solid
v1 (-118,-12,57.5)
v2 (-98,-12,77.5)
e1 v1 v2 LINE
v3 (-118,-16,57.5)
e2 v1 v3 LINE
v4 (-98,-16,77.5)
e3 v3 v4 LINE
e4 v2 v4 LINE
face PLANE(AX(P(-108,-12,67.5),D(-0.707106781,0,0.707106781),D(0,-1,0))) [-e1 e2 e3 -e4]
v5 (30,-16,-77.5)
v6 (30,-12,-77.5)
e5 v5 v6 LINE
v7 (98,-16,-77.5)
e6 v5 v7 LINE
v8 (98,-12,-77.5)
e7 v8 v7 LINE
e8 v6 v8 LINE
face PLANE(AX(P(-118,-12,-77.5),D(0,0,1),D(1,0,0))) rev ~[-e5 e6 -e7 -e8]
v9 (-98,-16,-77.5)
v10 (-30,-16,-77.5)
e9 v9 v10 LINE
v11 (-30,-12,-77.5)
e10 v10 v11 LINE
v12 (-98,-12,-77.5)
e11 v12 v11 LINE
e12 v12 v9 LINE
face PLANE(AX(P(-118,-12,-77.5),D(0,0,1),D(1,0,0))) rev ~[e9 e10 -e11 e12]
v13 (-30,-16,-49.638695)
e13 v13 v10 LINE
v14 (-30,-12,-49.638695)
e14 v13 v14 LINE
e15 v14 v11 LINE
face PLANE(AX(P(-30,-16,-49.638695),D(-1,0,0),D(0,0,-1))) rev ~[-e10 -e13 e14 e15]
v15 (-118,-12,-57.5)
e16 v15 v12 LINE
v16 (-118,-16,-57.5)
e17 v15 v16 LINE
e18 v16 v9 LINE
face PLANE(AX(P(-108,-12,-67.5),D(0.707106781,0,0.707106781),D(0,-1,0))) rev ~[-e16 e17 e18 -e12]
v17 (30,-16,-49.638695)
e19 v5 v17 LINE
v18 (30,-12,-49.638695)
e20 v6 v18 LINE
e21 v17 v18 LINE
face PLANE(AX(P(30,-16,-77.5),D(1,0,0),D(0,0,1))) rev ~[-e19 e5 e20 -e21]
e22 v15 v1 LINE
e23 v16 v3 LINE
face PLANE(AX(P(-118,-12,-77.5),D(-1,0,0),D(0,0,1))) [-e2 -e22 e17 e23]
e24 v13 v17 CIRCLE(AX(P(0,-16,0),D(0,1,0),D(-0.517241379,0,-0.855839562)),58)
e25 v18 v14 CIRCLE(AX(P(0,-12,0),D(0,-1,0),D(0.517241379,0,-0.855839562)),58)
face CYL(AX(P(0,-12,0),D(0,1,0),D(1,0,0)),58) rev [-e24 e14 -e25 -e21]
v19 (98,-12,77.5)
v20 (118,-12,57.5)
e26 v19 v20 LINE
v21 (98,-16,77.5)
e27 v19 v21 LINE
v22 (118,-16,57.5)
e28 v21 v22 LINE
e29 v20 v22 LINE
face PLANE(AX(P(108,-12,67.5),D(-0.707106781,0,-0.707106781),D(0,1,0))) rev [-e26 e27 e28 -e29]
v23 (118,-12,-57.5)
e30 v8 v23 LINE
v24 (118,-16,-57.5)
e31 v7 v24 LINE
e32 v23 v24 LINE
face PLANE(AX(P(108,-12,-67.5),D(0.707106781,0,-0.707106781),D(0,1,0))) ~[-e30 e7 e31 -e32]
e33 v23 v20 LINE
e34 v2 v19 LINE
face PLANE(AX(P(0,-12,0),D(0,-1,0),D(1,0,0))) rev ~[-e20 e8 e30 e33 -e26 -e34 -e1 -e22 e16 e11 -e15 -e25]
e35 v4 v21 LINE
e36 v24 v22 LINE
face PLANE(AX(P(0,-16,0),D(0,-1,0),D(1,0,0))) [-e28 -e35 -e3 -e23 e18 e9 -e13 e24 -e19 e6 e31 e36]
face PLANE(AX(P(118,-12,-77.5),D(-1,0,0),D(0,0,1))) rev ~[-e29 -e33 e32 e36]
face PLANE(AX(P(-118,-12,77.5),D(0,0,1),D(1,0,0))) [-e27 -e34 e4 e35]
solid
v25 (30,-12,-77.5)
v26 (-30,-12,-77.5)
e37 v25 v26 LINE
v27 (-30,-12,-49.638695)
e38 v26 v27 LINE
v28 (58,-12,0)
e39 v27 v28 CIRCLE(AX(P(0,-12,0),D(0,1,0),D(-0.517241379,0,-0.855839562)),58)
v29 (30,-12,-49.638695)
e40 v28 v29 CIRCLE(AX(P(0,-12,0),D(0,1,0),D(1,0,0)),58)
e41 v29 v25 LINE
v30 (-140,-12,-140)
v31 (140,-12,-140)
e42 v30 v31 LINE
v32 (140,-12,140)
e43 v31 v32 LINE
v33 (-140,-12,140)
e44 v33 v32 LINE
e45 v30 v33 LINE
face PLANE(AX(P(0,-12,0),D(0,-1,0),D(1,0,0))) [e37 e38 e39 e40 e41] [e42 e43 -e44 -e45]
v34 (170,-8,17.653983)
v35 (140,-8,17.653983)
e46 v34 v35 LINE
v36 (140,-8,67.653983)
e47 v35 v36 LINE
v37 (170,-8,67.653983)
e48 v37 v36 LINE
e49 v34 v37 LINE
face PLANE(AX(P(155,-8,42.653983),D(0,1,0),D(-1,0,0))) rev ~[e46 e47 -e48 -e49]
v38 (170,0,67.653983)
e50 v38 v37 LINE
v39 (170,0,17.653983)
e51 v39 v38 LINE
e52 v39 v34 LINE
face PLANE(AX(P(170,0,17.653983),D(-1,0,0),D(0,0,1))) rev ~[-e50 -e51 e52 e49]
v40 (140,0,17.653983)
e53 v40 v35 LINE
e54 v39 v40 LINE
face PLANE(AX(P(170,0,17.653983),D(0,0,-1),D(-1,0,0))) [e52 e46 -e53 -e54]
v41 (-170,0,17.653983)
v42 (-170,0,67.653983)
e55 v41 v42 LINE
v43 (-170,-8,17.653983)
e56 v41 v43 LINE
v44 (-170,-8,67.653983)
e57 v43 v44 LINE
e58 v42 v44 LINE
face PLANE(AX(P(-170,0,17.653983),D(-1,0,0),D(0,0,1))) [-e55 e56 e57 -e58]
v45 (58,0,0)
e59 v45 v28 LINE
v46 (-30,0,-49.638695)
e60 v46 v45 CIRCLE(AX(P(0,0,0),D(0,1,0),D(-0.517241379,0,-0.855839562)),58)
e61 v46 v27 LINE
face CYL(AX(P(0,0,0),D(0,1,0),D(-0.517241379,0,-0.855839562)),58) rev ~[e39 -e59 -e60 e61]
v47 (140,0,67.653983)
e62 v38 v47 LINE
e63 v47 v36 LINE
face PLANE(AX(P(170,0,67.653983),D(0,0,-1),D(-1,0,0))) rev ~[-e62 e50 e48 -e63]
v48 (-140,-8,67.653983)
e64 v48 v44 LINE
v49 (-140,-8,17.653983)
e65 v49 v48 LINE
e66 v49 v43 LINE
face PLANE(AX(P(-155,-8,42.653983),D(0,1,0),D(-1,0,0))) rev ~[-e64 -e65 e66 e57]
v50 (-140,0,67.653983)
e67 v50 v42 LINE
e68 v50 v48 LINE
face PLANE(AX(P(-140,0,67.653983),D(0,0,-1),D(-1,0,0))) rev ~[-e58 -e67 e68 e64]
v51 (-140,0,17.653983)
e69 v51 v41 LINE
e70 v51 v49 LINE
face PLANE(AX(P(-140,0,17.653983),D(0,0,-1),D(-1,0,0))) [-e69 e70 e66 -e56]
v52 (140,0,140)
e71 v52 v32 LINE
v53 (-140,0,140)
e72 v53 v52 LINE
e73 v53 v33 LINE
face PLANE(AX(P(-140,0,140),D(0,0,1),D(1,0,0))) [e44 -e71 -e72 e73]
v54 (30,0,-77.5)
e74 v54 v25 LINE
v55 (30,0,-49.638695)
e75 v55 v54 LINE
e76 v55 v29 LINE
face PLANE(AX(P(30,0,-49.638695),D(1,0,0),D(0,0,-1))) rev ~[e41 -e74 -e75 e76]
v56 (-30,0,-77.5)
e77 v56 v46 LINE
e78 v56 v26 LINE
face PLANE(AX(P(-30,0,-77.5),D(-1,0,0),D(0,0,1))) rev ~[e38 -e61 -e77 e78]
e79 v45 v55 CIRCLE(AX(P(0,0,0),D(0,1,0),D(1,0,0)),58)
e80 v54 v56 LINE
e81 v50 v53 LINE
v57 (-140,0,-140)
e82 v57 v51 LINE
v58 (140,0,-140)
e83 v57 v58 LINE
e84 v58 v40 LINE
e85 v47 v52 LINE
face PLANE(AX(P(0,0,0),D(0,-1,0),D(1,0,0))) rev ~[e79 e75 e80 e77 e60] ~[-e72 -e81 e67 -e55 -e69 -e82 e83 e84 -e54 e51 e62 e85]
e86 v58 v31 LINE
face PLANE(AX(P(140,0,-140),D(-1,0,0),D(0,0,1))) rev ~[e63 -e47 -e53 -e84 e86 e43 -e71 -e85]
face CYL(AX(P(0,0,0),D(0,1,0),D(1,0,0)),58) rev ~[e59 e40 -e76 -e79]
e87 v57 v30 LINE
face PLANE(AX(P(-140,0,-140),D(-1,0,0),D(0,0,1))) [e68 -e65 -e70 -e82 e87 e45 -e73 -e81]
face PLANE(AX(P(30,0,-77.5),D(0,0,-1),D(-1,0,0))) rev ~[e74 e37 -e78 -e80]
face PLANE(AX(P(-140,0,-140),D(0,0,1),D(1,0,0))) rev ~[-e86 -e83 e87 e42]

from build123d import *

# Parameters (mm, degrees)
F0_W     = 280
F0_H     = 280
F1_DEPTH = 12
F2_W     = 236
F2_H     = 155
F2_R     = 58
F3_DEPTH = 4
F4_SIZE  = 20
F5_W     = 30
F5_H     = 50
F6_DEPTH = 8
F8_DEPTH = 16.001
F9_DEPTH = 449


# Not quite as in the source:
# - an extrude ends at something that could not be found from the text; its depth is read off the source's solid


with BuildPart() as f1:
    # F0 (on Front) → F1 (new body)
    with BuildSketch(Plane.XZ):
        Rectangle(F0_W, F0_H)
        with BuildLine():
            ThreePointArc((-30, -49.638694584), (-28.4956136976, 50.5173237613), (58, 0))
            ThreePointArc((58, 0), (50.5173237613, -28.4956136976), (30, -49.638694584))
            Line((30, -49.638694584), (30, -77.5))
            Line((30, -77.5), (-30, -77.5))
            Line((-30, -77.5), (-30, -49.638694584))
        make_face(mode=Mode.SUBTRACT)
    extrude(amount=F1_DEPTH)

    # F5 (on face) → F6 (join)
    with BuildSketch(Plane(origin=(0, 0, 0), x_dir=(-1, 0, 0), z_dir=(0, 1, 0))):
        with Locations((-155, 42.6539830863)):
            Rectangle(F5_W, F5_H)
        with Locations((155, 42.6539830863)):
            Rectangle(F5_W, F5_H)
    extrude(amount=-F6_DEPTH)

    # F0 (on Front) → F9 (cut, through all)
    with BuildSketch(Plane.XZ):
        with BuildLine():
            ThreePointArc((30, -49.638694584), (0, -58), (-30, -49.638694584))
            Line((-30, -49.638694584), (-30, -77.5))
            Line((-30, -77.5), (30, -77.5))
            Line((30, -77.5), (30, -49.638694584))
        make_face()
    extrude(amount=-F9_DEPTH, mode=Mode.SUBTRACT)


with BuildPart() as f3:
    # F2 (on face) → F3 (new body)
    with BuildSketch(Plane.XZ.offset(12)):
        Rectangle(F2_W, F2_H)
        Circle(F2_R, mode=Mode.SUBTRACT)
    extrude(amount=F3_DEPTH)

    # F4
    f4_edges = [f3.edges().sort_by_distance(p)[0] for p in [
        (118, -14, -77.5),
        (-118, -14, -77.5),
        (118, -14, 77.5),
        (-118, -14, 77.5),
    ]]
    chamfer(f4_edges, length=F4_SIZE)

    # F7 (on face) → F8 (cut, through all)
    with BuildSketch(Plane.XZ.offset(16)):
        with BuildLine():
            ThreePointArc((30, -49.638694584), (0, -58), (-30, -49.638694584))
            Line((-30, -49.638694584), (-30, -77.5))
            Line((-30, -77.5), (30, -77.5))
            Line((30, -77.5), (30, -49.638694584))
        make_face()
    extrude(amount=-F8_DEPTH, mode=Mode.SUBTRACT)


solid = Compound([f1.part, f3.part])
